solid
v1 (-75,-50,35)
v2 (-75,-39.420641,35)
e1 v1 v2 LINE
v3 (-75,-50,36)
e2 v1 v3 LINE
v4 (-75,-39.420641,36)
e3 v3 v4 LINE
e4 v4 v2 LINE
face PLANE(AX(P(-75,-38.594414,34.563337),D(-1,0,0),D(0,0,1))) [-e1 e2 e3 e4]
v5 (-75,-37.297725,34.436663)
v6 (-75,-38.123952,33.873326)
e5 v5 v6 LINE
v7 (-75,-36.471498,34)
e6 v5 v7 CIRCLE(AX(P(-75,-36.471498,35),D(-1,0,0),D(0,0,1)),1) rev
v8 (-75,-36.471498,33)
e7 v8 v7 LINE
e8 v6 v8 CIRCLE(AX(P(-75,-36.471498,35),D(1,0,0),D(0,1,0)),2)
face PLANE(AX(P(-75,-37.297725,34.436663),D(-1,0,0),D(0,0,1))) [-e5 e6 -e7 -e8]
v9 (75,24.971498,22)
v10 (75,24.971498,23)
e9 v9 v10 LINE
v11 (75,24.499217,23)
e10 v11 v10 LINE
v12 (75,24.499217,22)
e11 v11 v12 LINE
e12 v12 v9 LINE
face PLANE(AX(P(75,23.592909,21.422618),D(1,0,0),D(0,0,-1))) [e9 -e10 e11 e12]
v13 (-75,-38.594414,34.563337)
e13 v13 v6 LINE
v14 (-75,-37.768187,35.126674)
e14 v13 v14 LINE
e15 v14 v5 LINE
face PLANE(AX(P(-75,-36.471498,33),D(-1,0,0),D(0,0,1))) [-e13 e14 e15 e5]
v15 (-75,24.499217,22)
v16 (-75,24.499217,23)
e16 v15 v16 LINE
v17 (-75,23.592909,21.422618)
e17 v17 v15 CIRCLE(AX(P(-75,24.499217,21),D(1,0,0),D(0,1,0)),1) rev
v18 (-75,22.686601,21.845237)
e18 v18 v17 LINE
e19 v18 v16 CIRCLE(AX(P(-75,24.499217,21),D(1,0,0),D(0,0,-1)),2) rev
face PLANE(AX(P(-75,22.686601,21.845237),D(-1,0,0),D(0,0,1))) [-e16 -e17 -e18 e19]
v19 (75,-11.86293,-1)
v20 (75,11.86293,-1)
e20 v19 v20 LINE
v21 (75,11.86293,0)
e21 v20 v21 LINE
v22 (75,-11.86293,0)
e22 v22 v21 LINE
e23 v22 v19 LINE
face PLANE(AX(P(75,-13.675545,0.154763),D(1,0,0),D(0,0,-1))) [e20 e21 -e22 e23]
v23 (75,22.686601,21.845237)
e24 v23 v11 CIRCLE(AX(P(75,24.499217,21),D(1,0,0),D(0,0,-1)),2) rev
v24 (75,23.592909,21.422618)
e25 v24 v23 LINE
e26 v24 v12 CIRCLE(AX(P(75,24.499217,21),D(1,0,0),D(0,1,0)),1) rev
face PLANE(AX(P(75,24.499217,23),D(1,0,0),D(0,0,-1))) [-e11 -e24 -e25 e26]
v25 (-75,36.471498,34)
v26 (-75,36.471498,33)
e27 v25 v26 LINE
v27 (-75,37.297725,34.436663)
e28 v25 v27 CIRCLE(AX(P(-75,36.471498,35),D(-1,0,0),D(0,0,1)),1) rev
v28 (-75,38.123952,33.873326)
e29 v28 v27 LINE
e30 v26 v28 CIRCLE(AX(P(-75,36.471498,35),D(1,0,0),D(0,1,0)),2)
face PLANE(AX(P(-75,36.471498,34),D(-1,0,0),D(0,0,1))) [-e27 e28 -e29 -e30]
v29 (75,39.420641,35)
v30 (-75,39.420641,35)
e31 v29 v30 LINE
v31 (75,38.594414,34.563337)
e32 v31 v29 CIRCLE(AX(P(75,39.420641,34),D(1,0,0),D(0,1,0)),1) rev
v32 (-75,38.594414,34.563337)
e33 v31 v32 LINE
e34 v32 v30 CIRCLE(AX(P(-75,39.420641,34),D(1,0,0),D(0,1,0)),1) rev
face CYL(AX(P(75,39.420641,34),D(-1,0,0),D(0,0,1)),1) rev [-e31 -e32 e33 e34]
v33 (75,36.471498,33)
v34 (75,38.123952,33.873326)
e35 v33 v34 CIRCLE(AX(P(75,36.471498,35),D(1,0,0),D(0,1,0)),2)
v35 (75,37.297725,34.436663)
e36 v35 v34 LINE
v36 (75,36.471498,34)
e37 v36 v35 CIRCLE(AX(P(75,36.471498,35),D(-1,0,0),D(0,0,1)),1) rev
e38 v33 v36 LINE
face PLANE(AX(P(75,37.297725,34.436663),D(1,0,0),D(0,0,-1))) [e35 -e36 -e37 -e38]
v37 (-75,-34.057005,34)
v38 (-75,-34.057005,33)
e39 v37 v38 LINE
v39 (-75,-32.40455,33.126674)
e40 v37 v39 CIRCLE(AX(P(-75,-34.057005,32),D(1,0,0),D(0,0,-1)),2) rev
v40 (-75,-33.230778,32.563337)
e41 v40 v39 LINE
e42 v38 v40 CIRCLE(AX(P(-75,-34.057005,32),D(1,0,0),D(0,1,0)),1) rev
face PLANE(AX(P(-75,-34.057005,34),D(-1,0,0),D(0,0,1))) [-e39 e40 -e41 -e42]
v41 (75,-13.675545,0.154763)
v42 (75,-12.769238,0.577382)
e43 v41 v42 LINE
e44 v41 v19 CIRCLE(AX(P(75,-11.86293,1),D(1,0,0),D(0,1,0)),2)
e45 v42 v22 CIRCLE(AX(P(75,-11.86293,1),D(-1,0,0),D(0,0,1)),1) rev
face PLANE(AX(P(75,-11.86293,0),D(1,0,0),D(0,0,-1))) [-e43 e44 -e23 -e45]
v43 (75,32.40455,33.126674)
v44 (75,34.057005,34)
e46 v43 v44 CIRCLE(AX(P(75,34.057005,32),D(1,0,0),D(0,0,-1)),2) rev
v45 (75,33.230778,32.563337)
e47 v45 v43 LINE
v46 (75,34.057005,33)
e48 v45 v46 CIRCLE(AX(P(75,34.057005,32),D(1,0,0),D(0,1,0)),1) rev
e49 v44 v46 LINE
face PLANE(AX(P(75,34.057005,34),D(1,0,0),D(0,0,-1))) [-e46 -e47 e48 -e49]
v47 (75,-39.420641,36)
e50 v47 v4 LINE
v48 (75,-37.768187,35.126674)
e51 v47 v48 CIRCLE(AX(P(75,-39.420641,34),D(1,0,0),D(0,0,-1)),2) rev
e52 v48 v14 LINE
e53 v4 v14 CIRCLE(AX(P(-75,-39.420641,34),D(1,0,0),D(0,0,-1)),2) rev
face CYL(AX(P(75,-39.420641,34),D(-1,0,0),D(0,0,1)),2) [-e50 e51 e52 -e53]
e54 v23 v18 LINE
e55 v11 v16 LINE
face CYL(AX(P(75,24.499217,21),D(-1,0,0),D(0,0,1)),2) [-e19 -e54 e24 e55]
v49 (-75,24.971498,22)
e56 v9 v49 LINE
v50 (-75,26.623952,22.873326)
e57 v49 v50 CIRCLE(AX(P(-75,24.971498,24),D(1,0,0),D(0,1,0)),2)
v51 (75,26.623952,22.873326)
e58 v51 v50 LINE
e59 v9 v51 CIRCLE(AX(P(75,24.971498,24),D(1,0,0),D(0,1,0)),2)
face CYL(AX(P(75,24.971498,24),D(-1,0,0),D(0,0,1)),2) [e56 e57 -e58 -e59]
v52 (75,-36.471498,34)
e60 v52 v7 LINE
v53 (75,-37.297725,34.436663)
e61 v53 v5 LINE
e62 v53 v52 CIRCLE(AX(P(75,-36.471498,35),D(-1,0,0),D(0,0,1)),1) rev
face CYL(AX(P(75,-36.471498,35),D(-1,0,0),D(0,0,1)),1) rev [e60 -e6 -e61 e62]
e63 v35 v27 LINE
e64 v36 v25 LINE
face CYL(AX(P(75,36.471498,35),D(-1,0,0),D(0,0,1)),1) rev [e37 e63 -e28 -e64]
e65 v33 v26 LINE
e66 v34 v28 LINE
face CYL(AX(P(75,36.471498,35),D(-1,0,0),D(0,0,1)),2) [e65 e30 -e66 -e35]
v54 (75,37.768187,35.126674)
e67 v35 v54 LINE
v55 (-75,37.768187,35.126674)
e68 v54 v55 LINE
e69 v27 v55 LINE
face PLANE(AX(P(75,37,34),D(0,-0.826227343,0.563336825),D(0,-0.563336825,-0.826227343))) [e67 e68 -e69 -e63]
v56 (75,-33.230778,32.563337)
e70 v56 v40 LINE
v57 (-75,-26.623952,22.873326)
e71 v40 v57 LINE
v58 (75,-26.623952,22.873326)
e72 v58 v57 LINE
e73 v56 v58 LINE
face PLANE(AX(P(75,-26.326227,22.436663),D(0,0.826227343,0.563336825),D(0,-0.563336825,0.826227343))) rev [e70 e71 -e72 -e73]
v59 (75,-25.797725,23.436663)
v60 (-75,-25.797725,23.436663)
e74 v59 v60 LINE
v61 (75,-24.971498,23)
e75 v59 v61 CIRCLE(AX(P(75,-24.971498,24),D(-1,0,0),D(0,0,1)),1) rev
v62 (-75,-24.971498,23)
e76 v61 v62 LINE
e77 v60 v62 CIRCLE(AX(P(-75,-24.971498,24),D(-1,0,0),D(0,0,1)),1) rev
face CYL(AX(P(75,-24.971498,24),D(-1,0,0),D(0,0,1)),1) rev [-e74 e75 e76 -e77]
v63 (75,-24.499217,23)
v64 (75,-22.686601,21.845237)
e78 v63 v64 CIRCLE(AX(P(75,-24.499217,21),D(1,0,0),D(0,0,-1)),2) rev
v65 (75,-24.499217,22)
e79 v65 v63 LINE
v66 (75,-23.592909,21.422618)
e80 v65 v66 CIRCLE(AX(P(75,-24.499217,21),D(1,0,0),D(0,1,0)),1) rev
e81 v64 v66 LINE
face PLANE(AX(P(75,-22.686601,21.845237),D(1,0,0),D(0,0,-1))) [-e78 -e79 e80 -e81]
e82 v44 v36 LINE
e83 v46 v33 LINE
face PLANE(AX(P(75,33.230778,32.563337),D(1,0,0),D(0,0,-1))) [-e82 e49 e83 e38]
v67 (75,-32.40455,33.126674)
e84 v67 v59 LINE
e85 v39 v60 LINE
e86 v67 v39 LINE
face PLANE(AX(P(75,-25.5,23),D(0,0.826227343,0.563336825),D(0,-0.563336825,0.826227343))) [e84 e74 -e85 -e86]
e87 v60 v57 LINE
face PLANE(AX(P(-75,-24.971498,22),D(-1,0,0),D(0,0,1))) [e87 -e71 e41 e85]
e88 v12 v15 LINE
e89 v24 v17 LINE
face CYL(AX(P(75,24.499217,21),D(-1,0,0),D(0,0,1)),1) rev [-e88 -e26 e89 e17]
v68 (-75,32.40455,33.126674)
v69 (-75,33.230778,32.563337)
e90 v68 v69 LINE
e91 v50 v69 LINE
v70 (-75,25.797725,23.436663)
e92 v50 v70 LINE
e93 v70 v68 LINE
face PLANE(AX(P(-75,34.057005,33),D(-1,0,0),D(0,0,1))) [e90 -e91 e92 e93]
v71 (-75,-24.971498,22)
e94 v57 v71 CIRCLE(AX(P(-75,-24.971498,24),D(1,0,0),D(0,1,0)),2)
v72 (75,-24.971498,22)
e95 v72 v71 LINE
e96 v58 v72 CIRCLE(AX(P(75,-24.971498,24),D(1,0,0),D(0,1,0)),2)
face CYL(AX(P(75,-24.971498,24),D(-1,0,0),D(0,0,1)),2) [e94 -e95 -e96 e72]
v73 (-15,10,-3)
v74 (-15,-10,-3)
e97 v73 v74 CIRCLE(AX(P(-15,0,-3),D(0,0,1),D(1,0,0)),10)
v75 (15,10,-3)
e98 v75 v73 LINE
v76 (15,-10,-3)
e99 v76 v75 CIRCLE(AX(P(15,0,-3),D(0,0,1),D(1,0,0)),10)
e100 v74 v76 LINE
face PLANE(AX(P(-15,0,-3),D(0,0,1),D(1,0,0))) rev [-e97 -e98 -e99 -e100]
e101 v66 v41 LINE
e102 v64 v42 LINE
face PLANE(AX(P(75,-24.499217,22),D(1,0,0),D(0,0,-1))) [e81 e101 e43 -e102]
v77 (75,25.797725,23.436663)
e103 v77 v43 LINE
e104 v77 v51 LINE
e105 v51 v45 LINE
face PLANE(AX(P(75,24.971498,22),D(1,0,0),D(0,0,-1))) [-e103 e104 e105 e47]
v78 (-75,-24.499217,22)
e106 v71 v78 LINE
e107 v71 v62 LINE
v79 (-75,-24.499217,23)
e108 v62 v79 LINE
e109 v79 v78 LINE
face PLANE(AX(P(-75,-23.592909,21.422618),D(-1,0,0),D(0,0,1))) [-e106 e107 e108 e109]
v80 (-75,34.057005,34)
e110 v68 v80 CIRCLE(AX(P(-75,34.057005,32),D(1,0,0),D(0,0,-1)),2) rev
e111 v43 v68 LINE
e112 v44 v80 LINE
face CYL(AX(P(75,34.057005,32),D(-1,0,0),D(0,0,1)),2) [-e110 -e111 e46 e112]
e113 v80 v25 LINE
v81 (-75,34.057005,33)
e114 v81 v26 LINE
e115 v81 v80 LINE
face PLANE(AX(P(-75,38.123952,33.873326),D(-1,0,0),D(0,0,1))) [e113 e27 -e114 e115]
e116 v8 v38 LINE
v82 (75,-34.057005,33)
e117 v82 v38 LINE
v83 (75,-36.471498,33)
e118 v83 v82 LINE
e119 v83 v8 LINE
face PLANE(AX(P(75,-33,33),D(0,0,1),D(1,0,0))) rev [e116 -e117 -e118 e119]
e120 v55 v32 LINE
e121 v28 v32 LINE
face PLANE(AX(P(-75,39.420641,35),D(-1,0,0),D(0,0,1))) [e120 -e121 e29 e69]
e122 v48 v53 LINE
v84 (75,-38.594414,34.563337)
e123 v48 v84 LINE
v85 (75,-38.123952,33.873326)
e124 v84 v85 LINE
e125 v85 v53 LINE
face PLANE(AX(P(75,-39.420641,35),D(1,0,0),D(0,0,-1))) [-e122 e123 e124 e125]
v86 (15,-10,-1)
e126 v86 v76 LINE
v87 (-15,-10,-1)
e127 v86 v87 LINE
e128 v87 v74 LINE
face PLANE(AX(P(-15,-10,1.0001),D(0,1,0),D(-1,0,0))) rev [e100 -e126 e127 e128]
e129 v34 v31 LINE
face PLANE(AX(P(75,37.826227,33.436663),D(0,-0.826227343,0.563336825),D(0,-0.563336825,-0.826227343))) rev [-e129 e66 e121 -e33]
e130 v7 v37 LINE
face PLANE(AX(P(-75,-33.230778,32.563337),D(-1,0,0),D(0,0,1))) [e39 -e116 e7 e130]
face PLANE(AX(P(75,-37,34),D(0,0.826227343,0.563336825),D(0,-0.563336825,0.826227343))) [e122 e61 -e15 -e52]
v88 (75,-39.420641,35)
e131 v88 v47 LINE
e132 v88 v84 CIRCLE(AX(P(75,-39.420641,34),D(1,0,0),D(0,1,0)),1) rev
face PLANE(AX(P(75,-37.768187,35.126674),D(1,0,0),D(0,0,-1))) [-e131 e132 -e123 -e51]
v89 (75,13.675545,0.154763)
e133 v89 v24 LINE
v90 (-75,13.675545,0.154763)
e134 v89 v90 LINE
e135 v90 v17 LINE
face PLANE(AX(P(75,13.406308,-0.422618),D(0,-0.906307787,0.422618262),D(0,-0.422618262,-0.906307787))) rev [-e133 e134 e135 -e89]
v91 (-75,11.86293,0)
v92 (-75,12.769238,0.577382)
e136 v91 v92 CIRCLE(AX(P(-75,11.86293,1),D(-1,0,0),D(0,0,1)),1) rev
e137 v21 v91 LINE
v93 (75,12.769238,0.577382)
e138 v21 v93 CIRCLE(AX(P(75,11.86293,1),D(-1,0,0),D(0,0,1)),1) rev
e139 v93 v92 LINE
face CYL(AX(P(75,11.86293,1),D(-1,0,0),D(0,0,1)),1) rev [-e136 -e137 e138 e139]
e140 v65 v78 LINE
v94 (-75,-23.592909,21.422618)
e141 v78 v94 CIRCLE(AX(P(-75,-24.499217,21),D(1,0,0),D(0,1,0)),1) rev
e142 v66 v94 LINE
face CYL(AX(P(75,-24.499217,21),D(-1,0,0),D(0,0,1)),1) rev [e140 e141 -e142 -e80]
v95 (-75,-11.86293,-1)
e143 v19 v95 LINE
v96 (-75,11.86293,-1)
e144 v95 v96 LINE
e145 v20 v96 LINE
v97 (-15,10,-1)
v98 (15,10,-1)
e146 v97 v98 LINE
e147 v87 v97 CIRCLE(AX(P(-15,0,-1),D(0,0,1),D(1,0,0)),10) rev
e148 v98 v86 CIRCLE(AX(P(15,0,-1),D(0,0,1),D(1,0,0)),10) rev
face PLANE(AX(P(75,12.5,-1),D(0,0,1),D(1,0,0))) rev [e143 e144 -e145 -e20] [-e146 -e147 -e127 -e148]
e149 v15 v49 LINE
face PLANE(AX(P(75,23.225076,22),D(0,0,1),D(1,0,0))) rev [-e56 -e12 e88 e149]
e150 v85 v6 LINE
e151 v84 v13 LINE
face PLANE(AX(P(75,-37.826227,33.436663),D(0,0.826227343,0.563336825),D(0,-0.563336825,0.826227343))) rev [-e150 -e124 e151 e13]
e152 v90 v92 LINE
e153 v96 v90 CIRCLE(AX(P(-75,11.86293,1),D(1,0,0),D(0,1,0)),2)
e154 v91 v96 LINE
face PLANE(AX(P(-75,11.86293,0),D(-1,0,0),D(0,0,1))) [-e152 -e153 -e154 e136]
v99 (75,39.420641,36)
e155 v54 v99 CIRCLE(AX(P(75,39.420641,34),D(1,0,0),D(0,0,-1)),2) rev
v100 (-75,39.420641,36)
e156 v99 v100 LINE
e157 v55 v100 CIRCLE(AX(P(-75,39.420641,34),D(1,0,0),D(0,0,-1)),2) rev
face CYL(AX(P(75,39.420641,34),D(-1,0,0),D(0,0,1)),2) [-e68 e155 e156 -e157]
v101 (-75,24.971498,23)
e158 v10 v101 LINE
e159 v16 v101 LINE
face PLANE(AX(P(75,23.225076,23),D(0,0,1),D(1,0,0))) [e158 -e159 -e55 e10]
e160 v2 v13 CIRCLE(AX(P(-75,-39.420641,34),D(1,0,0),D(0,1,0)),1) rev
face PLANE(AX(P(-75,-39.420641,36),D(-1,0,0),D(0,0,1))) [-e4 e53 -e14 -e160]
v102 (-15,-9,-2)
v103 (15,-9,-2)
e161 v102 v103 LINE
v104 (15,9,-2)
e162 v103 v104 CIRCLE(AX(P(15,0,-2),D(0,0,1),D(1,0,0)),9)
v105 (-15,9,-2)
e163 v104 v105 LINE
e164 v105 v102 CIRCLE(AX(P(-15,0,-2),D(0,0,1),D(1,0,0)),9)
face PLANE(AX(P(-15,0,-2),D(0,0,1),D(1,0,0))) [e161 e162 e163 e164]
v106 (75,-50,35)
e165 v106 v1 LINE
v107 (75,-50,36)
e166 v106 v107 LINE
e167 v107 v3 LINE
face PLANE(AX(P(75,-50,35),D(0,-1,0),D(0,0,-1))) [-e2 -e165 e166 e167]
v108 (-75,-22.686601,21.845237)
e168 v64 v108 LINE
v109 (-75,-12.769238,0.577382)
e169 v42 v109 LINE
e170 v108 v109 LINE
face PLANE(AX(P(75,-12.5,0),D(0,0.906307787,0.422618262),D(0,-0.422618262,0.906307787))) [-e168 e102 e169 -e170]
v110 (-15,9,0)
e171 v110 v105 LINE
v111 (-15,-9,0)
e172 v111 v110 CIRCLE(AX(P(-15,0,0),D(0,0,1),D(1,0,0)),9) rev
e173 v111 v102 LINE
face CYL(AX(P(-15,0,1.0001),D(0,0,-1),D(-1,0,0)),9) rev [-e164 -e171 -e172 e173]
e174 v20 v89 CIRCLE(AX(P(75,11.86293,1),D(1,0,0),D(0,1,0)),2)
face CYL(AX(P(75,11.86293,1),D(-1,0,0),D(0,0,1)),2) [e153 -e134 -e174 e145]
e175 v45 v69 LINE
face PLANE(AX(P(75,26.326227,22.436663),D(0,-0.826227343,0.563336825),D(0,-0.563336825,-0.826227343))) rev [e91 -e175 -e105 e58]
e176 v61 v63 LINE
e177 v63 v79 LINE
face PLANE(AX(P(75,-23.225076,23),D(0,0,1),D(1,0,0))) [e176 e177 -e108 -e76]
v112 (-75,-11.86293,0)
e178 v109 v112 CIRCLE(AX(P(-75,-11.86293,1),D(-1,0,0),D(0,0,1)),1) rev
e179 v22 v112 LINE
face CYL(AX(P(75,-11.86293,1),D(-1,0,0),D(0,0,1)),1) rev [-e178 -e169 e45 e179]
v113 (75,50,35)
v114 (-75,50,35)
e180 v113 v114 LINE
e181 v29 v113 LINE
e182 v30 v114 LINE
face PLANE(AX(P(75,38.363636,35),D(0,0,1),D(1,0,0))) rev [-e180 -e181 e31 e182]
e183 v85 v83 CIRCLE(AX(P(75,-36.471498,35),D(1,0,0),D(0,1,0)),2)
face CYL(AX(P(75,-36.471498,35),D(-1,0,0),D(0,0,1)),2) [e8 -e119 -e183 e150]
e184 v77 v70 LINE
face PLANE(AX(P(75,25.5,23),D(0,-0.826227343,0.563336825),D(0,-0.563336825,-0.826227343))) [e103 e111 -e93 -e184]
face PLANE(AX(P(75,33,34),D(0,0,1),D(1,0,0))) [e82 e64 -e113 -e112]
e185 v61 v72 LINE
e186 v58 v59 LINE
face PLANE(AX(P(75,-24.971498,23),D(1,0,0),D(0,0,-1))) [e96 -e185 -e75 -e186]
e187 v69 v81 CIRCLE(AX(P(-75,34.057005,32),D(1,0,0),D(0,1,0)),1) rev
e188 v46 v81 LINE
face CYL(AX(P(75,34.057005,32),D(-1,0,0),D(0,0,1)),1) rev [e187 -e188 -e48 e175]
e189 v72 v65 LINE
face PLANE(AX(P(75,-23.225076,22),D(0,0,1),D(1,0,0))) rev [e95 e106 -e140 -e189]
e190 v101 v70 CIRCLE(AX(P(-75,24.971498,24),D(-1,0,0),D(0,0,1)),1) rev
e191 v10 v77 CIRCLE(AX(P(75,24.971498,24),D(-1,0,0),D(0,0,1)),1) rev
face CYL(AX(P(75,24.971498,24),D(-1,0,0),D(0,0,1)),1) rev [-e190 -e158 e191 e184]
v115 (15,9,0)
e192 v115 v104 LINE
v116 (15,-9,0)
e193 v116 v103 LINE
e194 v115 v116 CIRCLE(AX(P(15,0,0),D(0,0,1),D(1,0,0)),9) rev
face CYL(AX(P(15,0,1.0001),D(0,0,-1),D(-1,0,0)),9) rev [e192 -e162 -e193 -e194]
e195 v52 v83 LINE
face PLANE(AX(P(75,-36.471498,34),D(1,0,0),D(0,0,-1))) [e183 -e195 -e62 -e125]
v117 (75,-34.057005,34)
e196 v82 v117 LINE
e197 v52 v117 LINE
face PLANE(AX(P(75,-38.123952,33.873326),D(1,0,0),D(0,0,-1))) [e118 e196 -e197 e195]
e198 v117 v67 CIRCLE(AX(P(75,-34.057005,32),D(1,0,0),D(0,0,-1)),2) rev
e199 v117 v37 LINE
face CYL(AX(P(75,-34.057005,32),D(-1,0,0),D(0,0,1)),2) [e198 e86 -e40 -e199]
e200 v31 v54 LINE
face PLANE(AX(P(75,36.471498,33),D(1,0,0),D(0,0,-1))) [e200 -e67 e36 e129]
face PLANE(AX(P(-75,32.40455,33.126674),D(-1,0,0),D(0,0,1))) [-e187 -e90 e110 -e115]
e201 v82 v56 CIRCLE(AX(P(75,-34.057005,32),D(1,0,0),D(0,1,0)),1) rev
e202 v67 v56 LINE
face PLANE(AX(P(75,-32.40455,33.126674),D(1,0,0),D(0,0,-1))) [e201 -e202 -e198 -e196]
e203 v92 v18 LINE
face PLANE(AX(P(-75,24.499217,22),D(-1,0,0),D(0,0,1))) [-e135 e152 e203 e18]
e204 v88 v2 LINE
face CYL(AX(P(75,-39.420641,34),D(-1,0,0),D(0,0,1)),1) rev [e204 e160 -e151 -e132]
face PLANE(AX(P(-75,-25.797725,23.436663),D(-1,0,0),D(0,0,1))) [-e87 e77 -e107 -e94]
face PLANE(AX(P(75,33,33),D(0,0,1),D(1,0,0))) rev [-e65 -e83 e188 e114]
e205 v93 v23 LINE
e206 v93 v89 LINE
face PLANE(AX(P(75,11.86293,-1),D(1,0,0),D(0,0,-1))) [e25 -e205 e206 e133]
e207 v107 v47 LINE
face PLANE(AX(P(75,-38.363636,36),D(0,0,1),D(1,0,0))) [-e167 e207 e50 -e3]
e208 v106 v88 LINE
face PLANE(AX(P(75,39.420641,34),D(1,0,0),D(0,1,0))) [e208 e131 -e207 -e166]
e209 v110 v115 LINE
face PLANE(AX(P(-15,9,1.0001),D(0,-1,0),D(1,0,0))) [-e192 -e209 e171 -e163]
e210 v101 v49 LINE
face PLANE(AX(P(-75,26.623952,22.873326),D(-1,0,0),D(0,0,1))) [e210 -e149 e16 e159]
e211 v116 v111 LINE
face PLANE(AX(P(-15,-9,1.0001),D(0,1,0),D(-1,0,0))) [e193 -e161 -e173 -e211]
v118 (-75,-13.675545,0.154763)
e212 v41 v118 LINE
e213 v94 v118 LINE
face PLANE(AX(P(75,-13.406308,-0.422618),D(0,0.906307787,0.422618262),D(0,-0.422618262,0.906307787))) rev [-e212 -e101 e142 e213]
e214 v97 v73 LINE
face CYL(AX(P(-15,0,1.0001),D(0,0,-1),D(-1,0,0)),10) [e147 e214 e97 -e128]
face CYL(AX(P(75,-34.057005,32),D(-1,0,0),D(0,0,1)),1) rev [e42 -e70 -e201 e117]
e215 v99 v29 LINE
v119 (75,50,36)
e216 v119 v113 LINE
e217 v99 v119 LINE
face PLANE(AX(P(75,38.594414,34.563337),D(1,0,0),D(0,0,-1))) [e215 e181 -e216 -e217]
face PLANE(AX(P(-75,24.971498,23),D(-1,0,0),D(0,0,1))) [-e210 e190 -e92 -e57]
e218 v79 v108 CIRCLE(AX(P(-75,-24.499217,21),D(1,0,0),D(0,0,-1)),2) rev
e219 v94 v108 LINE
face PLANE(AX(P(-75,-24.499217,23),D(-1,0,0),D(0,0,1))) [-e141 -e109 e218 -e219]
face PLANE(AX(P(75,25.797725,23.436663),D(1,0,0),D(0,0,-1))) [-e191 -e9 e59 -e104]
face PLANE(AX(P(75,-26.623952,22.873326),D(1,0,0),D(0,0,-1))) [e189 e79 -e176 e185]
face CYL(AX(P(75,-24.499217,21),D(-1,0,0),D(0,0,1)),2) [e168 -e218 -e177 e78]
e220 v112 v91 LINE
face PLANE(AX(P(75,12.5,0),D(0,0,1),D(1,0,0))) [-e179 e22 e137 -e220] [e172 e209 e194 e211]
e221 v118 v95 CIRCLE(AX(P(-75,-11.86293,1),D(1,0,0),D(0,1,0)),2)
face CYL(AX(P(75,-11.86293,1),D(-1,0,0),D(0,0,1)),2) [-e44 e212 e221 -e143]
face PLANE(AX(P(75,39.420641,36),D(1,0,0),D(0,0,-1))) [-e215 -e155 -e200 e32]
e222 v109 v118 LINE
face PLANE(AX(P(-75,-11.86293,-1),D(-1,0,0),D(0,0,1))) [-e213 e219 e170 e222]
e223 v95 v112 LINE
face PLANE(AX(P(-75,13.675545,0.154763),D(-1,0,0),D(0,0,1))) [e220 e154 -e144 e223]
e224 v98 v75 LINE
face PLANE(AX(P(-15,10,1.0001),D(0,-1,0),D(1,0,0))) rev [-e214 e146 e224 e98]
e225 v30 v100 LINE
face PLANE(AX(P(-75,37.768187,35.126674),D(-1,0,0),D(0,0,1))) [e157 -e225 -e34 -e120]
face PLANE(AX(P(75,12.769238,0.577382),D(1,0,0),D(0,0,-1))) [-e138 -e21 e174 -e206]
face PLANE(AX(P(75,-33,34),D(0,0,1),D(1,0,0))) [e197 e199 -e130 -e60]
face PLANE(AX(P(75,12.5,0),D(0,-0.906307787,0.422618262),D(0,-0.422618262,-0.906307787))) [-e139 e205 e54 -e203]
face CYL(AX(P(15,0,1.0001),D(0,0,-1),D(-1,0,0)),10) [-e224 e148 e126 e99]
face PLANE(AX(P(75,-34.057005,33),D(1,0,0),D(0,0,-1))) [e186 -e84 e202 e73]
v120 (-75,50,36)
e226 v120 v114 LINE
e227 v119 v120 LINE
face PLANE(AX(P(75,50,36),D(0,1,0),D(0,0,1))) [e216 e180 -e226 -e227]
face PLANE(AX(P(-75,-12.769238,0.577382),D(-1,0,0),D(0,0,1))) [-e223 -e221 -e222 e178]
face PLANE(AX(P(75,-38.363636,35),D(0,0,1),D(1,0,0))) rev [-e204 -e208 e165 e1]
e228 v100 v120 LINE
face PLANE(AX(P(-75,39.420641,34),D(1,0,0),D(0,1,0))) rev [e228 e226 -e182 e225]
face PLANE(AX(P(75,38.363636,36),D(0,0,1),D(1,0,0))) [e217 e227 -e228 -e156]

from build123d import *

# Parameters (mm, degrees)
BASE_FLANGE1_DEPTH         = 75
SHEET_START                = -1
SHEET_METAL_STAMP1_DEPTH   = 1
SHEET_START_2              = -3
SHEET_METAL_STAMP1_2_DEPTH = 1
SHEET_START_3              = -2
SHEET_METAL_STAMP1_3_DEPTH = 1


# Read off the part's stored shape, not the designer's step: Sheet Metal Stamp1
# Sheet-metal steps are written as plain solids
with BuildPart() as part:
    # Sketch1 → Base-Flange1 (new, symmetric)
    with BuildSketch(Plane.YZ):
        with BuildLine():
            Line((50, 36), (39.420641265, 36))
            ThreePointArc((39.420641265, 36), (38.486121949, 35.768240269), (37.768186579, 35.126673649))
            Line((37.768186579, 35.126673649), (37.297724892, 34.436663175))
            ThreePointArc((37.297724892, 34.436663175), (36.938757207, 34.115879865), (36.471497549, 34))
            Line((36.471497549, 34), (34.057004901, 34))
            ThreePointArc((34.057004901, 34), (33.122485586, 33.768240269), (32.404550215, 33.126673649))
            Line((32.404550215, 33.126673649), (25.797724892, 23.436663175))
            ThreePointArc((25.797724892, 23.436663175), (25.438757207, 23.115879865), (24.971497549, 23))
            Line((24.971497549, 23), (24.499216659, 23))
            ThreePointArc((24.499216659, 23), (23.424617442, 22.686782892), (22.686601085, 21.845236523))
            Line((22.686601085, 21.845236523), (12.769237526, 0.577381738))
            ThreePointArc((12.769237526, 0.577381738), (12.400229348, 0.156608554), (11.862929739, 0))
            Line((11.862929739, 0), (-11.862929739, 0))
            ThreePointArc((-11.862929739, 0), (-12.400229348, 0.156608554), (-12.769237526, 0.577381738))
            Line((-12.769237526, 0.577381738), (-22.686601085, 21.845236523))
            ThreePointArc((-22.686601085, 21.845236523), (-23.424617442, 22.686782892), (-24.499216659, 23))
            Line((-24.499216659, 23), (-24.971497549, 23))
            ThreePointArc((-24.971497549, 23), (-25.438757207, 23.115879865), (-25.797724892, 23.436663175))
            Line((-25.797724892, 23.436663175), (-32.404550215, 33.126673649))
            ThreePointArc((-32.404550215, 33.126673649), (-33.122485586, 33.768240269), (-34.057004901, 34))
            Line((-34.057004901, 34), (-36.471497549, 34))
            ThreePointArc((-36.471497549, 34), (-36.938757207, 34.115879865), (-37.297724892, 34.436663175))
            Line((-37.297724892, 34.436663175), (-37.768186579, 35.126673649))
            ThreePointArc((-37.768186579, 35.126673649), (-38.486121949, 35.768240269), (-39.420641265, 36))
            Line((-39.420641265, 36), (-50, 36))
            Line((-50, 36), (-50, 35))
            Line((-50, 35), (-39.420641265, 35))
            ThreePointArc((-39.420641265, 35), (-38.953381607, 34.884120135), (-38.594413922, 34.563336825))
            Line((-38.594413922, 34.563336825), (-38.123952235, 33.873326351))
            ThreePointArc((-38.123952235, 33.873326351), (-37.406016865, 33.231759731), (-36.471497549, 33))
            Line((-36.471497549, 33), (-34.057004901, 33))
            ThreePointArc((-34.057004901, 33), (-33.589745243, 32.884120135), (-33.230777558, 32.563336825))
            Line((-33.230777558, 32.563336825), (-26.623952235, 22.873326351))
            ThreePointArc((-26.623952235, 22.873326351), (-25.906016865, 22.231759731), (-24.971497549, 22))
            Line((-24.971497549, 22), (-24.499216659, 22))
            ThreePointArc((-24.499216659, 22), (-23.961917051, 21.843391446), (-23.592908872, 21.422618262))
            Line((-23.592908872, 21.422618262), (-13.675545313, 0.154763477))
            ThreePointArc((-13.675545313, 0.154763477), (-12.937528956, -0.686782892), (-11.862929739, -1))
            Line((-11.862929739, -1), (11.862929739, -1))
            ThreePointArc((11.862929739, -1), (12.937528956, -0.686782892), (13.675545313, 0.154763477))
            Line((13.675545313, 0.154763477), (23.592908872, 21.422618262))
            ThreePointArc((23.592908872, 21.422618262), (23.961917051, 21.843391446), (24.499216659, 22))
            Line((24.499216659, 22), (24.971497549, 22))
            ThreePointArc((24.971497549, 22), (25.906016865, 22.231759731), (26.623952235, 22.873326351))
            Line((26.623952235, 22.873326351), (33.230777558, 32.563336825))
            ThreePointArc((33.230777558, 32.563336825), (33.589745243, 32.884120135), (34.057004901, 33))
            Line((34.057004901, 33), (36.471497549, 33))
            ThreePointArc((36.471497549, 33), (37.406016865, 33.231759731), (38.123952235, 33.873326351))
            Line((38.123952235, 33.873326351), (38.594413922, 34.563336825))
            ThreePointArc((38.594413922, 34.563336825), (38.953381607, 34.884120135), (39.420641265, 35))
            Line((39.420641265, 35), (50, 35))
            Line((50, 35), (50, 36))
        make_face()
    extrude(amount=BASE_FLANGE1_DEPTH, both=True)

    # Sheet Metal Stamp1 outline → Sheet Metal Stamp1 (cut)
    with BuildSketch(Plane.XY.offset(SHEET_START)):
        with BuildLine():
            ThreePointArc((-15, 9), (-24, 0), (-15, -9))
            Line((-15, -9), (15, -9))
            ThreePointArc((15, -9), (24, 0), (15, 9))
            Line((15, 9), (-15, 9))
        make_face()
    extrude(amount=SHEET_METAL_STAMP1_DEPTH, mode=Mode.SUBTRACT)



with BuildPart() as body_2:
    # Sheet Metal Stamp1 2 outline → Sheet Metal Stamp1 2 (new body)
    with BuildSketch(Plane.XY.offset(SHEET_START_2)):
        with BuildLine():
            ThreePointArc((-15, 10), (-25, 0), (-15, -10))
            Line((-15, -10), (15, -10))
            ThreePointArc((15, -10), (25, 0), (15, 10))
            Line((15, 10), (-15, 10))
        make_face()
    extrude(amount=SHEET_METAL_STAMP1_2_DEPTH)


with BuildPart() as part_1:
    add(part.part)

    add(body_2.part)  # Sheet Metal Stamp1 3 merges body 2
    # Sheet Metal Stamp1 3 outline → Sheet Metal Stamp1 3 (add)
    with BuildSketch(Plane.XY.offset(SHEET_START_3)):
        with BuildLine():
            ThreePointArc((-15, 10), (-25, 0), (-15, -10))
            Line((-15, -10), (15, -10))
            ThreePointArc((15, -10), (25, 0), (15, 10))
            Line((15, 10), (-15, 10))
        make_face()
        with BuildLine():
            Line((15, -9), (-15, -9))
            ThreePointArc((-15, -9), (-24, 0), (-15, 9))
            Line((-15, 9), (15, 9))
            ThreePointArc((15, 9), (24, 0), (15, -9))
        make_face(mode=Mode.SUBTRACT)
    extrude(amount=SHEET_METAL_STAMP1_3_DEPTH)


solid = part_1.part
